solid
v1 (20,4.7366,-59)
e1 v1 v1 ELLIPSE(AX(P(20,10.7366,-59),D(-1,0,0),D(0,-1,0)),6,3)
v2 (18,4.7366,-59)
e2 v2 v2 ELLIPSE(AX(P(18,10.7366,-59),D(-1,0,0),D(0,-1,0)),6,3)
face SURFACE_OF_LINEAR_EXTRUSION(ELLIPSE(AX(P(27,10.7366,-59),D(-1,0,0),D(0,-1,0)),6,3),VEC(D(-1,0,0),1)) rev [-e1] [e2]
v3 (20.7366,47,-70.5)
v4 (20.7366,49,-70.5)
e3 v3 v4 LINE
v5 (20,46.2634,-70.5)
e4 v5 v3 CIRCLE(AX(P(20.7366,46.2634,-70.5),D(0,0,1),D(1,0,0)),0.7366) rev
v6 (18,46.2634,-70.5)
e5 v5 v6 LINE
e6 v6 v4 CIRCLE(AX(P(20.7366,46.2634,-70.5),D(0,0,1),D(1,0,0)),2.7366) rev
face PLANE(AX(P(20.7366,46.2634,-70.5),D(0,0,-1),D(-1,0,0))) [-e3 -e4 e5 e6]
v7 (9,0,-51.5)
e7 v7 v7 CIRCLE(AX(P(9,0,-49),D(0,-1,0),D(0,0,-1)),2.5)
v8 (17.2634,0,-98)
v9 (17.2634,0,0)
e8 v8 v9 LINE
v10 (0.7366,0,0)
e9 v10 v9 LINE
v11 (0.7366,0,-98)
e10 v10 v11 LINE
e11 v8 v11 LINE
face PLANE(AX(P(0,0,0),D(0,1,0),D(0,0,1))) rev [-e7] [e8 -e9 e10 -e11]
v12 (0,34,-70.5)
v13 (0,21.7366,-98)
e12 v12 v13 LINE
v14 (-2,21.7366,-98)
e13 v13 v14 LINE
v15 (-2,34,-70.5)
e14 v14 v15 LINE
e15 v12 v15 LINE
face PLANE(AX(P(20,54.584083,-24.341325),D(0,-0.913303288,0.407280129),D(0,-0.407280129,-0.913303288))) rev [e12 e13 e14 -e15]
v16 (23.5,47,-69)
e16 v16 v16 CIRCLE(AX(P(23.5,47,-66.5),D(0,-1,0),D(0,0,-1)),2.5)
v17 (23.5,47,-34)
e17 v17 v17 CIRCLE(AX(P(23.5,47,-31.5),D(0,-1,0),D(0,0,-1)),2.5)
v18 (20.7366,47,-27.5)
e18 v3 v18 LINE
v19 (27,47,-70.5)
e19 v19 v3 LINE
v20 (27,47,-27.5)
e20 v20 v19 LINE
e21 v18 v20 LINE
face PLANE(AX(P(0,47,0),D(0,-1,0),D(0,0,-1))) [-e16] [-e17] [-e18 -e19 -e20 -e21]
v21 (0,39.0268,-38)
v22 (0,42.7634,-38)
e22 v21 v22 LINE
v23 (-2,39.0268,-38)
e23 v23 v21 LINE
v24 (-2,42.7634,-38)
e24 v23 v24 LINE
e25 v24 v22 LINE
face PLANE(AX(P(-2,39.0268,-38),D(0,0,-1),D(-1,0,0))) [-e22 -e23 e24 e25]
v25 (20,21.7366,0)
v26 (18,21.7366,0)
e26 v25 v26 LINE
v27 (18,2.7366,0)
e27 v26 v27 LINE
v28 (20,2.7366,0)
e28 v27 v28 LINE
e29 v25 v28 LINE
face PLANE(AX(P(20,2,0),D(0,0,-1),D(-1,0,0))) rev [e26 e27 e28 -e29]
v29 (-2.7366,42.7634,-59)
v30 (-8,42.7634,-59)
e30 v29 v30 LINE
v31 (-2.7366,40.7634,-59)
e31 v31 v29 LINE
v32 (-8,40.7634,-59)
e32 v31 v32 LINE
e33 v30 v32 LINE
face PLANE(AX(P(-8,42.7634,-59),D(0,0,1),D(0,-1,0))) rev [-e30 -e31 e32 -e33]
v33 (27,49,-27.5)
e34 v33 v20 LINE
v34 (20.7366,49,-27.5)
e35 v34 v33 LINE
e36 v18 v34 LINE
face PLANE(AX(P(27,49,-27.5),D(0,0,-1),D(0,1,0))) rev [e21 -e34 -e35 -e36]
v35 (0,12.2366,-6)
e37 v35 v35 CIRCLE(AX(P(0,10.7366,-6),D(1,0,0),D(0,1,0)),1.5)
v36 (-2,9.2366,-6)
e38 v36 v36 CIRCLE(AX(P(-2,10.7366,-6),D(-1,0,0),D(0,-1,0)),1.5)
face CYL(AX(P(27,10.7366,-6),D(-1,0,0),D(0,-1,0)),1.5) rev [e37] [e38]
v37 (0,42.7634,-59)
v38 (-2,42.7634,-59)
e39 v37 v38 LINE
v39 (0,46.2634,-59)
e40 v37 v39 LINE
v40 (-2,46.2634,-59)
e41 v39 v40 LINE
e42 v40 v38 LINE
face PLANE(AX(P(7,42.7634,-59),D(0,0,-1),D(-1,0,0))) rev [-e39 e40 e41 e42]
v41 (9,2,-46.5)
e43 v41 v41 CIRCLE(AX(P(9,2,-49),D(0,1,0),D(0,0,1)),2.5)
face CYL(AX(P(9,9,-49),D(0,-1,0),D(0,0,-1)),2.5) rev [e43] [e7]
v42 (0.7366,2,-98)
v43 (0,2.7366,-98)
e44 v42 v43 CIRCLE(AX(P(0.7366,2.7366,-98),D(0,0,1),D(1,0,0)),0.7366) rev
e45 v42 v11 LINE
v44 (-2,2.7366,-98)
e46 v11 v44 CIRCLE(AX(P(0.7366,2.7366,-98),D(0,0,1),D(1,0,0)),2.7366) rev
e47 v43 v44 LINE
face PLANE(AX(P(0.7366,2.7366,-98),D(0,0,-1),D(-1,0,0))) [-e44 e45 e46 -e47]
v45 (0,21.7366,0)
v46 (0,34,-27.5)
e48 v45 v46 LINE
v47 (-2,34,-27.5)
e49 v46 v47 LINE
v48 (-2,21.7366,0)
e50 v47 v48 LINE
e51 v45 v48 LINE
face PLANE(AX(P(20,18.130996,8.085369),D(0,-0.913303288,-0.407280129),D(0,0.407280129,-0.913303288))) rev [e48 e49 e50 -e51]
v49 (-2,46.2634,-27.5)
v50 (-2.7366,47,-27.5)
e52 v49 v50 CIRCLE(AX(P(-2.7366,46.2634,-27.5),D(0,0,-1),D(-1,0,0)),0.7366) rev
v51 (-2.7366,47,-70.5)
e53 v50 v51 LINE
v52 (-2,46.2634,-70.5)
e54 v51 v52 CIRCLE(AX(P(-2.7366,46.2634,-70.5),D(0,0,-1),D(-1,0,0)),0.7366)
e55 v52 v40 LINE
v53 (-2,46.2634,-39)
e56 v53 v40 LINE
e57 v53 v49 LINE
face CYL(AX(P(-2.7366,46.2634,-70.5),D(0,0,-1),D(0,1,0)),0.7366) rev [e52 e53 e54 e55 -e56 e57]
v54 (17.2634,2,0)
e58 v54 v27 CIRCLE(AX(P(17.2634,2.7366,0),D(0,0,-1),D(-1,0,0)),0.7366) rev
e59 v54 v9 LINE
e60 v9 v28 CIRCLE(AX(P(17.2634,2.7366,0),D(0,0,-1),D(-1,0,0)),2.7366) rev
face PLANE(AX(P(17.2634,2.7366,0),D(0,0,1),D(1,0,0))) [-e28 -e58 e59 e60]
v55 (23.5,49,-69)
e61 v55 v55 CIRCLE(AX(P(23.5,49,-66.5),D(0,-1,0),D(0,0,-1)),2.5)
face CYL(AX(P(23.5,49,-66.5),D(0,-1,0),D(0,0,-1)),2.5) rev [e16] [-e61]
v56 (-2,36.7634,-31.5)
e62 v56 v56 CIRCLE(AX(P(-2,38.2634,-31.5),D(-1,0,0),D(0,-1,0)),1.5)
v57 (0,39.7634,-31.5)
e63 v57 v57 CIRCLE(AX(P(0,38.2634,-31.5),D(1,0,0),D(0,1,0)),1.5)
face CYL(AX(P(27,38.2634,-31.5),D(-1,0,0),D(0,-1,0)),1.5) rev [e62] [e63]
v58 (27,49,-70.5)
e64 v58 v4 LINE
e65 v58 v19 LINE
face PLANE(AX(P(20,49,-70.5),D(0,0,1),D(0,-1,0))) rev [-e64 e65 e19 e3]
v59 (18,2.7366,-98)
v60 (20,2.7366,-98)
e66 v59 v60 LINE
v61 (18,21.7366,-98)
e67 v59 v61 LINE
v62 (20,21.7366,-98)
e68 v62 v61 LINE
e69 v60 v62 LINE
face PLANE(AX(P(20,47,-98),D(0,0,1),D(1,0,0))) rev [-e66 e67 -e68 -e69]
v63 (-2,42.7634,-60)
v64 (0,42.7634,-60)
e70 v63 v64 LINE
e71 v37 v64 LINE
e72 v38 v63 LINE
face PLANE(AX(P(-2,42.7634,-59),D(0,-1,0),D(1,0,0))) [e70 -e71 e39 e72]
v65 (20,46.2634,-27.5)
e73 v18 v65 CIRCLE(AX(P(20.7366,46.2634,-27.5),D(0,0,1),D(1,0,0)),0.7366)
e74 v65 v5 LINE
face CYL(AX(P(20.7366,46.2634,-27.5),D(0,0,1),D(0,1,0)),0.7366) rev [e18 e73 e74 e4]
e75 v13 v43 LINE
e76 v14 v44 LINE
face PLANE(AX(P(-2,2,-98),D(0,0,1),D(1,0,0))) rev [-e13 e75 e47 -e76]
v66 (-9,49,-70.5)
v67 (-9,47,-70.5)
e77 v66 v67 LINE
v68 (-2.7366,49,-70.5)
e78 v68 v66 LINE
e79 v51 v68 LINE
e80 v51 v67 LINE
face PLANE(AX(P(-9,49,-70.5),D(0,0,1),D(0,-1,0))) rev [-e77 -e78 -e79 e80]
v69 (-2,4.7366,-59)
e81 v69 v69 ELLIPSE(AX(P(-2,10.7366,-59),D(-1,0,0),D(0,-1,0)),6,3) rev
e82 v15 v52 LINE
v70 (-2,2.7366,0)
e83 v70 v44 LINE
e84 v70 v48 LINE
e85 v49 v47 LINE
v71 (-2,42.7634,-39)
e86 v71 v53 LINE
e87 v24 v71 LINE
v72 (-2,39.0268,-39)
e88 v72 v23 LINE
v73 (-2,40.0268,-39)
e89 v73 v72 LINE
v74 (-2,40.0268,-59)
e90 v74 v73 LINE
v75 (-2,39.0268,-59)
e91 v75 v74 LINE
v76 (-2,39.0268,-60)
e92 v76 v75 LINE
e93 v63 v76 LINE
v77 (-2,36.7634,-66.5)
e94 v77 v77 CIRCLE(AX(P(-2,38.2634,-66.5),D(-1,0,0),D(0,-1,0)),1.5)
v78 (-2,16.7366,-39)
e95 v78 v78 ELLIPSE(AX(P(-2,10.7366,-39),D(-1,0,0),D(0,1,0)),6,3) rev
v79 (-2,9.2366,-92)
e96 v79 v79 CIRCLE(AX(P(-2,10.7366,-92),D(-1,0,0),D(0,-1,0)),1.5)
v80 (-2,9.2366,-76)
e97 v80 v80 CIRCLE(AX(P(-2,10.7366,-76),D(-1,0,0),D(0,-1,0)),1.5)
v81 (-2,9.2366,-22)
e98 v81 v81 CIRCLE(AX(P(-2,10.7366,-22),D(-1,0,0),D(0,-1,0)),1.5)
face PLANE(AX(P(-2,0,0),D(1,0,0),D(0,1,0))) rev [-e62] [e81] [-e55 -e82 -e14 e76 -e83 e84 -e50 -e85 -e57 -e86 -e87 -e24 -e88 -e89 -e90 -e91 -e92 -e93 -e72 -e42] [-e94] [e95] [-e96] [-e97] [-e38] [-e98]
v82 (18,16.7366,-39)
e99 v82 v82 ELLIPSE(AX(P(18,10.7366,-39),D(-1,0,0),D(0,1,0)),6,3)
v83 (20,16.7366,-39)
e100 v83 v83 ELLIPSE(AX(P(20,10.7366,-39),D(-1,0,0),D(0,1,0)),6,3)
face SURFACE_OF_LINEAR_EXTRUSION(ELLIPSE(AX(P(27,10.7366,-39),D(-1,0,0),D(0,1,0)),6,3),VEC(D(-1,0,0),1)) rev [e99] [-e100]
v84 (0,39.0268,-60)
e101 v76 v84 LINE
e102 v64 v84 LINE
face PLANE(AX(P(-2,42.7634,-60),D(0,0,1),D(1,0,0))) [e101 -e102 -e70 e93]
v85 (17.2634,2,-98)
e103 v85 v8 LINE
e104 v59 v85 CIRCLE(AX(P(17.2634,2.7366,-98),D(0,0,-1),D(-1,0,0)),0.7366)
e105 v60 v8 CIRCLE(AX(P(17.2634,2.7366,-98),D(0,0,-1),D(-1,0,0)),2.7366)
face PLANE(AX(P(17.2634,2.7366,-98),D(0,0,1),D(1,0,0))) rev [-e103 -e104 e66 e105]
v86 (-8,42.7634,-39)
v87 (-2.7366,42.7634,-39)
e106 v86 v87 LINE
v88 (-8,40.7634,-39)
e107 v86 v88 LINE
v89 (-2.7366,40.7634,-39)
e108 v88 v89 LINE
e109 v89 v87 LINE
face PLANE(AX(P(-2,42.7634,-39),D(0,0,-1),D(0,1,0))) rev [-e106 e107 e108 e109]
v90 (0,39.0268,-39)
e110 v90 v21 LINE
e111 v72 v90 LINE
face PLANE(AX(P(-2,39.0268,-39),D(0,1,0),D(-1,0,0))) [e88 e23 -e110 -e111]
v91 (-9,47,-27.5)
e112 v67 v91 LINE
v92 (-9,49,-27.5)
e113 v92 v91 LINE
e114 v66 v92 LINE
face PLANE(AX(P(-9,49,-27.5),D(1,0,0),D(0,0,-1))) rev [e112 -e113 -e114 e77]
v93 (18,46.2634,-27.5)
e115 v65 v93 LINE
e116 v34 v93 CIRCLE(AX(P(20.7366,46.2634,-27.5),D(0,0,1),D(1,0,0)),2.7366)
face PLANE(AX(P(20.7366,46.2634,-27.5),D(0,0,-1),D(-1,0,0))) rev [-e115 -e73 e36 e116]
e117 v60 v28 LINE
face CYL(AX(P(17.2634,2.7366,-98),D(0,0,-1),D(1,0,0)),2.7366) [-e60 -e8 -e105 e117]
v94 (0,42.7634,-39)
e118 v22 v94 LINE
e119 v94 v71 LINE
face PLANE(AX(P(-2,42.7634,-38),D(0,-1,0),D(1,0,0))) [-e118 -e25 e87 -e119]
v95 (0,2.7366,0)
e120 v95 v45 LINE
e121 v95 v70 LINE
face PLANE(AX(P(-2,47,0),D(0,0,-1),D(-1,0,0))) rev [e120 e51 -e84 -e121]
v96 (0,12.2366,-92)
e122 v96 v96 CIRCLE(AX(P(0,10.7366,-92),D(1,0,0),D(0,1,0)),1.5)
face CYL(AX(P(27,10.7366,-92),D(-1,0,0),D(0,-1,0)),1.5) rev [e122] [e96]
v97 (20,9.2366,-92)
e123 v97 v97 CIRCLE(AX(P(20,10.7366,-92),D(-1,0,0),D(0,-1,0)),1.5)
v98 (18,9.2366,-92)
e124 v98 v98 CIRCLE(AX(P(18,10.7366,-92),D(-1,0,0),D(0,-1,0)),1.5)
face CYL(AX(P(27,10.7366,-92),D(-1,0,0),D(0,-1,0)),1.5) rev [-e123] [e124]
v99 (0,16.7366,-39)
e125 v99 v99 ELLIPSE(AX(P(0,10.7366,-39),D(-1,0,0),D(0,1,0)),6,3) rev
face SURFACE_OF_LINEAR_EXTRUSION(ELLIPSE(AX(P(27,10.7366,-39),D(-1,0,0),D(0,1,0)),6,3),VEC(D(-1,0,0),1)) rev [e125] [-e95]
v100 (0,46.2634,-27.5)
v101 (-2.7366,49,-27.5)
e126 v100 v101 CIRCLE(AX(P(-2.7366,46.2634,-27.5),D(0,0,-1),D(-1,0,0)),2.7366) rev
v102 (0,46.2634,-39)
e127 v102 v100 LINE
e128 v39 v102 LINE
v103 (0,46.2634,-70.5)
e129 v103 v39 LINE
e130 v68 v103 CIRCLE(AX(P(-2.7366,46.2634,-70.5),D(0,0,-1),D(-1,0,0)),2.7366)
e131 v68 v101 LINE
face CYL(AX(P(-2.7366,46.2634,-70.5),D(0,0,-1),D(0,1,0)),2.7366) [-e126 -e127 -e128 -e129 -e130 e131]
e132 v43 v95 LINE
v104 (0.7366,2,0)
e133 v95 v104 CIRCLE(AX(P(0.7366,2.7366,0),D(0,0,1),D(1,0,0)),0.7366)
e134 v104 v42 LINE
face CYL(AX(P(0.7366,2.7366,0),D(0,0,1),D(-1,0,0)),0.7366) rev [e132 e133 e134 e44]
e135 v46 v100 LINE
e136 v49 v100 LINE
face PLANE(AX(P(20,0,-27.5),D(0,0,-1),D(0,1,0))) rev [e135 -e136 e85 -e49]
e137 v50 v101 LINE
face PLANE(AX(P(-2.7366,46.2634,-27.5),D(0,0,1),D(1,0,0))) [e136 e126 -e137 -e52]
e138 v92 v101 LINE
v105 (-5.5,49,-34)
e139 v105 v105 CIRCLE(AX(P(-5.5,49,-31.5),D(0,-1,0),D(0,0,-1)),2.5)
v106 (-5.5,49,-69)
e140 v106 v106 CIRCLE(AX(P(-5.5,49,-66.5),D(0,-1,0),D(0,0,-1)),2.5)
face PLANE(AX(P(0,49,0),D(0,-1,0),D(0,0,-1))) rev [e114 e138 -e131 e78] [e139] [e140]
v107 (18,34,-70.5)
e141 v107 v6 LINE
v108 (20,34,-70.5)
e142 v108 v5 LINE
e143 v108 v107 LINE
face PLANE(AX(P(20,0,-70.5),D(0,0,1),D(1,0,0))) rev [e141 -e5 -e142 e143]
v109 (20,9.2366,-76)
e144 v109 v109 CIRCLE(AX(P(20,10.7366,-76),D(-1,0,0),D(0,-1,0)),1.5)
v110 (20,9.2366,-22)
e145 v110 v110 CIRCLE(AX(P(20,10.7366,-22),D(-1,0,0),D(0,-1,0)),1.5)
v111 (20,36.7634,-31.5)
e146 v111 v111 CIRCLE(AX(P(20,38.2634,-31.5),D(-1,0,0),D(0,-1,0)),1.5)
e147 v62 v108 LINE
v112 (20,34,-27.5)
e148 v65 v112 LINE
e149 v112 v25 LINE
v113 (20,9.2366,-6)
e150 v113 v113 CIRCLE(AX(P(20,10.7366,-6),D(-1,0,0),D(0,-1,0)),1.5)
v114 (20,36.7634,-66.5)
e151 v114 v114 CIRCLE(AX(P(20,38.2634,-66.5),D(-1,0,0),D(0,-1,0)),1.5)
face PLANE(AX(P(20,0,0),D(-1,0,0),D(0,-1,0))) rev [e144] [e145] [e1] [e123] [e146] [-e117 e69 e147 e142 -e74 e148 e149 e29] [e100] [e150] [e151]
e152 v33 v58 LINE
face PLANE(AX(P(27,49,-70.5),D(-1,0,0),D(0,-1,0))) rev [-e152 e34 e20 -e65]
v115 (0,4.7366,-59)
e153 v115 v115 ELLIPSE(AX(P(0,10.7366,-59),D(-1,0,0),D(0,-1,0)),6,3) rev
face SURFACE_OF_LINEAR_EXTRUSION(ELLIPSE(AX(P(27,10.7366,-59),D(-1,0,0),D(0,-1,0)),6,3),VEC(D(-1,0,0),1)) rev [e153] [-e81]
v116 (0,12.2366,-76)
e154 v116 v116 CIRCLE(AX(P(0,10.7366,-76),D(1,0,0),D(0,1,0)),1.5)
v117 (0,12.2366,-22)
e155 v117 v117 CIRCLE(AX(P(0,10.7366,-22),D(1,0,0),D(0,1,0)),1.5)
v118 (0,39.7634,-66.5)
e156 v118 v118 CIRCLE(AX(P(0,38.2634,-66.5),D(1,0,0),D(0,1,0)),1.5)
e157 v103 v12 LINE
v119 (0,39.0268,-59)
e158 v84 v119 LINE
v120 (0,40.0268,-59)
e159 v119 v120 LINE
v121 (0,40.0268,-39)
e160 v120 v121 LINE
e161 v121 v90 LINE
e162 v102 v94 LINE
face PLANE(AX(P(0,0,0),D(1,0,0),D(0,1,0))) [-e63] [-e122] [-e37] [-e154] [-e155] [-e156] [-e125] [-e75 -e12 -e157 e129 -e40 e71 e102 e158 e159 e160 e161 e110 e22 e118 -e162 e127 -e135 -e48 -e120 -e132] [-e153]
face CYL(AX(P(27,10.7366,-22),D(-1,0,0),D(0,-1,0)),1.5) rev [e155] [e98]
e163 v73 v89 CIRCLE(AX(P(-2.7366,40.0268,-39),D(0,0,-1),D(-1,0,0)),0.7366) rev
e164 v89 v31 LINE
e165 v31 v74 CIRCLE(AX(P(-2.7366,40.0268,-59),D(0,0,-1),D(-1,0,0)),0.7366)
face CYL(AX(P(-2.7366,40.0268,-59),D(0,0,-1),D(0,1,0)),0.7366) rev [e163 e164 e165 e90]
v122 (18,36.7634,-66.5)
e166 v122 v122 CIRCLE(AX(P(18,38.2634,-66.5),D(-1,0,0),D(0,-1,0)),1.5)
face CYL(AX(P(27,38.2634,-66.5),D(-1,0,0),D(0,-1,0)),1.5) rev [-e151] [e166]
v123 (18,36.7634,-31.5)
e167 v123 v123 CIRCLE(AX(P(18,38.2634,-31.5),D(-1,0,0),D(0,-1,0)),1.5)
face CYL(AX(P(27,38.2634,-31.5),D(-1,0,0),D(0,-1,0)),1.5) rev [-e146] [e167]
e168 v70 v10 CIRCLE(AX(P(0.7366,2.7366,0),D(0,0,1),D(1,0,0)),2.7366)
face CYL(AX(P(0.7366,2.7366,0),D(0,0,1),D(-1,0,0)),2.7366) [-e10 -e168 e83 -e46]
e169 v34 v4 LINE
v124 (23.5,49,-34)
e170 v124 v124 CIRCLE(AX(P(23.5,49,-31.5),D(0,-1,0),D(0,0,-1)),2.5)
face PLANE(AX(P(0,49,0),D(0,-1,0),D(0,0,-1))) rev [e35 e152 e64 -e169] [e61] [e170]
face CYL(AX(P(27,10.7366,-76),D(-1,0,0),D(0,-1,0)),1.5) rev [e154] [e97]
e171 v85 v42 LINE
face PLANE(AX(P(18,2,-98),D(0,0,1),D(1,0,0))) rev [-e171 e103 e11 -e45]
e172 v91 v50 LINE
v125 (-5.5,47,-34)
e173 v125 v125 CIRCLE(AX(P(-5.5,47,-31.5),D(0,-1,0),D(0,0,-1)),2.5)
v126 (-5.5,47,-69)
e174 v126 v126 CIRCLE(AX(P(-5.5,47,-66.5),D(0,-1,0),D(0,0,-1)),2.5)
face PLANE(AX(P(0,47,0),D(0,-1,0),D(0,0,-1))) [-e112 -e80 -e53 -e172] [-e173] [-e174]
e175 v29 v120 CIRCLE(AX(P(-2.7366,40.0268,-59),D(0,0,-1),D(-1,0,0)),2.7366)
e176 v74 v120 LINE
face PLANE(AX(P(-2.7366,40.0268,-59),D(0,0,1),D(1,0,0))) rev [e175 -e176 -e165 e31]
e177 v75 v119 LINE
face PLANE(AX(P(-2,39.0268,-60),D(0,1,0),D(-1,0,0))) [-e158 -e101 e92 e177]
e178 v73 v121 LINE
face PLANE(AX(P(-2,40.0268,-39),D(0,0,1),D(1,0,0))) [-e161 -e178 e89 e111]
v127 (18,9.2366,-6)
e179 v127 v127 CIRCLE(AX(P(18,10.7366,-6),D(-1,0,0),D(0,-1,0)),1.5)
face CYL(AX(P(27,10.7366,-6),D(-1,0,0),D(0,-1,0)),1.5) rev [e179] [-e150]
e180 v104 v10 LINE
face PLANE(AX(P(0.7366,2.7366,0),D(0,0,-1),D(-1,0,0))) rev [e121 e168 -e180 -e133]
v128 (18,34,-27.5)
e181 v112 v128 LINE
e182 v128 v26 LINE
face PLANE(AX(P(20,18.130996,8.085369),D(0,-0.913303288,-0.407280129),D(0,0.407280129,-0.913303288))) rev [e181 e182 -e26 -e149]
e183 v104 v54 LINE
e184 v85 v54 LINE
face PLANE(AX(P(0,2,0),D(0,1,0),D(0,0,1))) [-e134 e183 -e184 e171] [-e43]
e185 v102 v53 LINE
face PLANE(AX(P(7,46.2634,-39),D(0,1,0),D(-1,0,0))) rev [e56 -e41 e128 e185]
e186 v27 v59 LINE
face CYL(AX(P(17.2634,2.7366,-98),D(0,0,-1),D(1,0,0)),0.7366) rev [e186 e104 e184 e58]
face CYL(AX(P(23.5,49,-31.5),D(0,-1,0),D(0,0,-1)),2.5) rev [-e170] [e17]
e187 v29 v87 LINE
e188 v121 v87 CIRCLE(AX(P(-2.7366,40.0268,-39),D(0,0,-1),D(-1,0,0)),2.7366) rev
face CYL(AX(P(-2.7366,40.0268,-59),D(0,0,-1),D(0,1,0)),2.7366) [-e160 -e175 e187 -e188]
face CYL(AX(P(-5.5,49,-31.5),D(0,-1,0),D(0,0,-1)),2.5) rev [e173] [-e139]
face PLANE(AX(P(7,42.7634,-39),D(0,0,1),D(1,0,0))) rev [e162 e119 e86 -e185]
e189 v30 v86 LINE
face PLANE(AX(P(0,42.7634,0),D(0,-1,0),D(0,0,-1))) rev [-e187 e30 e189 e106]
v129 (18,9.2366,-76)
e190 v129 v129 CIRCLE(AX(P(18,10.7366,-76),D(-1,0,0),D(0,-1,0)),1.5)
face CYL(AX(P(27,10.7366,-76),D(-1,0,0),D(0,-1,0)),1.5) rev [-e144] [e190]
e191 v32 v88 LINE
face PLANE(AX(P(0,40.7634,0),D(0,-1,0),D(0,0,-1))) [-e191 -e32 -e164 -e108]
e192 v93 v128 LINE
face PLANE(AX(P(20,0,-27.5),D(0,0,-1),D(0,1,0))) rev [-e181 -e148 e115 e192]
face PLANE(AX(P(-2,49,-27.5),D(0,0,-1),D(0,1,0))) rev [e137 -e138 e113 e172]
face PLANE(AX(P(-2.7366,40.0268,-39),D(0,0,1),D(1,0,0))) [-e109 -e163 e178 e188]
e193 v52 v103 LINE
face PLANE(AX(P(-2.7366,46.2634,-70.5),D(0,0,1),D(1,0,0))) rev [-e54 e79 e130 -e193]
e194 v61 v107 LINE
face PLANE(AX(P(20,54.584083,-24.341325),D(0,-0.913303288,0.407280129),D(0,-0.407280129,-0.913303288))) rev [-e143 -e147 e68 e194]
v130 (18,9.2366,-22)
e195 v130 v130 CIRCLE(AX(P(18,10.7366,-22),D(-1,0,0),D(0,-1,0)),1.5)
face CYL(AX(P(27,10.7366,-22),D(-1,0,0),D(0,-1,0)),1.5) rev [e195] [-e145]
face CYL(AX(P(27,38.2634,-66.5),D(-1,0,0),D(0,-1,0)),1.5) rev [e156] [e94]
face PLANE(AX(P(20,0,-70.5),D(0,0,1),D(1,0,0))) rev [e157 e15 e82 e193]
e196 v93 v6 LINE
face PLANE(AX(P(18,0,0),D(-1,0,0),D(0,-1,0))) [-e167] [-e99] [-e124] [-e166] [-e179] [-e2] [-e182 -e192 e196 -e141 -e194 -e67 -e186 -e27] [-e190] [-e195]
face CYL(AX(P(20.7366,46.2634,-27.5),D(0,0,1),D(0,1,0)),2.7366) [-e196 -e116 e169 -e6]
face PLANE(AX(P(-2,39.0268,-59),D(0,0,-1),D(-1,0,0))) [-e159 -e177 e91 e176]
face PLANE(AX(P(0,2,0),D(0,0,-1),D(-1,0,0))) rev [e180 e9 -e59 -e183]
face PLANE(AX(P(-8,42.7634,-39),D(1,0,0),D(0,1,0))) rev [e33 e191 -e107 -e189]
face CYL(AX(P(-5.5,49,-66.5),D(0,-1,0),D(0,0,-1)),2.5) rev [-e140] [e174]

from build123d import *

# Parameters (mm, degrees)
SCHIZZO1_W                       = 18
SCHIZZO1_H                       = 98
BASE_FLANGIA1_DEPTH              = 2
BORDO_FLANGIA1_STRIP_W           = 9.4732
BORDO_FLANGIA1_STRIP_H           = 2
BORDO_FLANGIA1_STRIP_CUT_DEPTH   = 98
BORDO_FLANGIA1_STRIP_2_W         = 9.4732
BORDO_FLANGIA1_STRIP_2_H         = 2
BORDO_FLANGIA1_STRIP_CUT_2_DEPTH = 98
BORDO_FLANGIA1_DEPTH             = 98
BORDO_FLANGIA1_BEND_DEPTH        = 98
TAGLIO_ESTRUSIONE2_DEPTH         = 111.891839195
TAGLIO_ESTRUSIONE2_DEPTH_BACK    = 111.891839195
BORDO_FLANGIA2_STRIP_W           = 9.4732
BORDO_FLANGIA2_STRIP_H           = 2
BORDO_FLANGIA2_STRIP_CUT_DEPTH   = 43
BORDO_FLANGIA2_STRIP_2_W         = 9.4732
BORDO_FLANGIA2_STRIP_2_H         = 2
BORDO_FLANGIA2_STRIP_CUT_2_DEPTH = 43
BORDO_FLANGIA2_DEPTH             = 43
BORDO_FLANGIA2_BEND_DEPTH        = 43
TAGLIO_ESTRUSIONE3_DEPTH         = 114.340195871
TAGLIO_ESTRUSIONE3_DEPTH_BACK    = 114.340195871
SCHIZZO7_R                       = 1.5
SCHIZZO8_R                       = 2.5
TAGLIO_ESTRUSIONE5_DEPTH         = 112.991071073
SCHIZZO9_R                       = 2.5
TAGLIO_ESTRUSIONE6_DEPTH         = 112.991071073
TAGLIO_ESTRUSIONE7_DEPTH         = 114.340195871
TAGLIO_ESTRUSIONE7_DEPTH_BACK    = 114.340195871
SCHIZZO10_RX                     = 6
SCHIZZO10_RY                     = 3
SCHIZZO11_W                      = 20
SCHIZZO11_H                      = 3.5
TAGLIO_ESTRUSIONE8_DEPTH         = 9
BORDO_FLANGIA4_START             = -60
BORDO_FLANGIA4_DEPTH             = 22
BORDO_FLANGIA4_2_DEPTH           = 1
BORDO_FLANGIA4_START_2           = -39
BORDO_FLANGIA4_3_DEPTH           = 1
BORDO_FLANGIA4_START_3           = -59
BORDO_FLANGIA4_4_DEPTH           = 20
SCHIZZO13_R                      = 2.5
TAGLIO_ESTRUSIONE9_DEPTH         = 9


# Read off the part's stored shape, not the designer's step: Bordo-Flangia4
# Sheet-metal steps are written as plain solids
with BuildPart() as part:
    # Schizzo1 → Base-Flangia1 (new body)
    with BuildSketch(Plane(origin=(0, 0, 0), x_dir=(1, 0, 0), z_dir=(0, 1, 0))):
        with Locations((9, 49)):
            Rectangle(SCHIZZO1_W, SCHIZZO1_H)
    extrude(amount=BASE_FLANGIA1_DEPTH)

    # Bordo-Flangia1 strip (across the edge) → Bordo-Flangia1 strip cut (cut)
    with BuildSketch(Plane(origin=(0, 2, -98), x_dir=(1, 0, 0), z_dir=(0, 0, 1))):
        with Locations((-4, -1)):
            Rectangle(BORDO_FLANGIA1_STRIP_W, BORDO_FLANGIA1_STRIP_H)
    extrude(amount=BORDO_FLANGIA1_STRIP_CUT_DEPTH, mode=Mode.SUBTRACT)

    # Bordo-Flangia1 strip 2 (across the edge) → Bordo-Flangia1 strip cut 2 (cut)
    with BuildSketch(Plane(origin=(18, 2, 0), x_dir=(-1, 0, 0), z_dir=(0, 0, -1))):
        with Locations((-4, -1)):
            Rectangle(BORDO_FLANGIA1_STRIP_2_W, BORDO_FLANGIA1_STRIP_2_H)
    extrude(amount=BORDO_FLANGIA1_STRIP_CUT_2_DEPTH, mode=Mode.SUBTRACT)

    # Bordo-Flangia1 section (across the edge) → Bordo-Flangia1 (add)
    with BuildSketch(Plane(origin=(0, 2, -98), x_dir=(1, 0, 0), z_dir=(0, 0, 1))):
        with BuildLine():
            Line((-2, 0.7366), (-2, 45))
            Line((-2, 45), (0, 45))
            Line((0, 45), (0, 0.7366))
            ThreePointArc((0, 0.7366), (0.215745145, 0.215745145), (0.7366, 0))
            Line((0.7366, 0), (0.7366, -2))
            ThreePointArc((0.7366, -2), (-1.198468417, -1.198468417), (-2, 0.7366))
        make_face()
    extrude(amount=BORDO_FLANGIA1_DEPTH)

    # Bordo-Flangia1 section 2 (across the edge) → Bordo-Flangia1 bend (add)
    with BuildSketch(Plane(origin=(18, 2, 0), x_dir=(-1, 0, 0), z_dir=(0, 0, -1))):
        with BuildLine():
            Line((-2, 0.7366), (-2, 45))
            Line((-2, 45), (0, 45))
            Line((0, 45), (0, 0.7366))
            ThreePointArc((0, 0.7366), (0.215745145, 0.215745145), (0.7366, 0))
            Line((0.7366, 0), (0.7366, -2))
            ThreePointArc((0.7366, -2), (-1.198468417, -1.198468417), (-2, 0.7366))
        make_face()
    extrude(amount=BORDO_FLANGIA1_BEND_DEPTH)

    # Schizzo4 → Taglio-Estrusione2 (cut, two sides: drawn at the far end of the back side and taken through both)
    with BuildSketch(Plane.ZY.offset(2).offset(-TAGLIO_ESTRUSIONE2_DEPTH_BACK)):
        Polygon((-98, 47), (-98, 21.7366), (-70.5, 34), (-70.5, 47), align=None)
        Polygon((-27.5, 34), (0, 21.7366), (0, 47), (-27.5, 47), align=None)
    extrude(amount=TAGLIO_ESTRUSIONE2_DEPTH + TAGLIO_ESTRUSIONE2_DEPTH_BACK, mode=Mode.SUBTRACT)

    # Bordo-Flangia2 strip (across the edge) → Bordo-Flangia2 strip cut (cut)
    with BuildSketch(Plane(origin=(20, 47, -70.5), x_dir=(0, -1, 0), z_dir=(0, 0, 1))):
        with Locations((-4, -1)):
            Rectangle(BORDO_FLANGIA2_STRIP_W, BORDO_FLANGIA2_STRIP_H)
    extrude(amount=BORDO_FLANGIA2_STRIP_CUT_DEPTH, mode=Mode.SUBTRACT)

    # Bordo-Flangia2 strip 2 (across the edge) → Bordo-Flangia2 strip cut 2 (cut)
    with BuildSketch(Plane(origin=(-2, 47, -27.5), x_dir=(0, -1, 0), z_dir=(0, 0, -1))):
        with Locations((-4, -1)):
            Rectangle(BORDO_FLANGIA2_STRIP_2_W, BORDO_FLANGIA2_STRIP_2_H)
    extrude(amount=BORDO_FLANGIA2_STRIP_CUT_2_DEPTH, mode=Mode.SUBTRACT)

    # Bordo-Flangia2 section (across the edge) → Bordo-Flangia2 (add)
    with BuildSketch(Plane(origin=(20, 47, -70.5), x_dir=(0, -1, 0), z_dir=(0, 0, 1))):
        with BuildLine():
            Line((-2, 0.7366), (-2, 7))
            Line((-2, 7), (0, 7))
            Line((0, 7), (0, 0.7366))
            ThreePointArc((0, 0.7366), (0.215745145, 0.215745145), (0.7366, 0))
            Line((0.7366, 0), (0.7366, -2))
            ThreePointArc((0.7366, -2), (-1.198468417, -1.198468417), (-2, 0.7366))
        make_face()
    extrude(amount=BORDO_FLANGIA2_DEPTH)

    # Bordo-Flangia2 section 2 (across the edge) → Bordo-Flangia2 bend (add)
    with BuildSketch(Plane(origin=(-2, 47, -27.5), x_dir=(0, -1, 0), z_dir=(0, 0, -1))):
        with BuildLine():
            Line((-2, 0.7366), (-2, 7))
            Line((-2, 7), (0, 7))
            Line((0, 7), (0, 0.7366))
            ThreePointArc((0, 0.7366), (0.215745145, 0.215745145), (0.7366, 0))
            Line((0.7366, 0), (0.7366, -2))
            ThreePointArc((0.7366, -2), (-1.198468417, -1.198468417), (-2, 0.7366))
        make_face()
    extrude(amount=BORDO_FLANGIA2_BEND_DEPTH)

    # Schizzo7 → Taglio-Estrusione3 (cut, two sides: drawn at the far end of the back side and taken through both)
    with BuildSketch(Plane.ZY.offset(2).offset(-TAGLIO_ESTRUSIONE3_DEPTH_BACK)):
        with Locations(Location((-66.5, 38.2634, 0), (0, 0, 270))):
            Circle(SCHIZZO7_R)
        with Locations(Location((-31.5, 38.2634, 0), (0, 0, 270))):
            Circle(SCHIZZO7_R)
        with Locations(Location((-92, 10.7366, 0), (0, 0, 270))):
            Circle(SCHIZZO7_R)
        with Locations(Location((-6, 10.7366, 0), (0, 0, 270))):
            Circle(SCHIZZO7_R)
        with Locations(Location((-76, 10.7366, 0), (0, 0, 270))):
            Circle(SCHIZZO7_R)
        with Locations(Location((-22, 10.7366, 0), (0, 0, 270))):
            Circle(SCHIZZO7_R)
    extrude(amount=TAGLIO_ESTRUSIONE3_DEPTH + TAGLIO_ESTRUSIONE3_DEPTH_BACK, mode=Mode.SUBTRACT)

    # Schizzo8 → Taglio-Estrusione5 (cut, through all)
    with BuildSketch(Plane.XZ.offset(-47)):
        with Locations(Location((23.5, -31.5, 0), (0, 0, 270))):
            Circle(SCHIZZO8_R)
        with Locations(Location((23.5, -66.5, 0), (0, 0, 270))):
            Circle(SCHIZZO8_R)
    extrude(amount=-TAGLIO_ESTRUSIONE5_DEPTH, mode=Mode.SUBTRACT)

    # Schizzo9 → Taglio-Estrusione6 (cut, through all)
    with BuildSketch(Plane.XZ.offset(-47)):
        with Locations(Location((-5.5, -31.5, 0), (0, 0, 270))):
            Circle(SCHIZZO9_R)
        with Locations(Location((-5.5, -66.5, 0), (0, 0, 270))):
            Circle(SCHIZZO9_R)
    extrude(amount=-TAGLIO_ESTRUSIONE6_DEPTH, mode=Mode.SUBTRACT)

    # Schizzo10 → Taglio-Estrusione7 (cut, two sides: drawn at the far end of the back side and taken through both)
    with BuildSketch(Plane.ZY.offset(2).offset(-TAGLIO_ESTRUSIONE7_DEPTH_BACK)):
        with Locations(Location((-59, 10.7366), (0, 0, -90))):
            Ellipse(SCHIZZO10_RX, SCHIZZO10_RY)
        with Locations(Location((-39, 10.7366), (0, 0, 90))):
            Ellipse(SCHIZZO10_RX, SCHIZZO10_RY)
    extrude(amount=TAGLIO_ESTRUSIONE7_DEPTH + TAGLIO_ESTRUSIONE7_DEPTH_BACK, mode=Mode.SUBTRACT)

    # Schizzo11 → Taglio-Estrusione8 (cut)
    with BuildSketch(Plane.ZY.offset(2)):
        with Locations((-49, 44.5134)):
            Rectangle(SCHIZZO11_W, SCHIZZO11_H)
    extrude(amount=-TAGLIO_ESTRUSIONE8_DEPTH, mode=Mode.SUBTRACT)

    # Bordo-Flangia4 outline → Bordo-Flangia4 (cut)
    with BuildSketch(Plane.XY.offset(BORDO_FLANGIA4_START)):
        with BuildLine():
            Line((0, 42.7634), (-2, 42.7634))
            Line((-2, 42.7634), (-2, 42.662402398))
            ThreePointArc((-2, 42.662402398), (-0.556604688, 41.681067209), (0, 40.0268))
            Line((0, 40.0268), (0, 42.7634))
        make_face()
    extrude(amount=BORDO_FLANGIA4_DEPTH, mode=Mode.SUBTRACT)

    # Bordo-Flangia4 2 outline → Bordo-Flangia4 2 (cut)
    with BuildSketch(Plane.XY.offset(BORDO_FLANGIA4_START)):
        with BuildLine():
            ThreePointArc((0, 40.0268), (-0.556604688, 41.681067209), (-2, 42.662402398))
            Line((-2, 42.662402398), (-2, 39.0268))
            Line((-2, 39.0268), (0, 39.0268))
            Line((0, 39.0268), (0, 40.0268))
        make_face()
    extrude(amount=BORDO_FLANGIA4_2_DEPTH, mode=Mode.SUBTRACT)

    # Bordo-Flangia4 3 outline → Bordo-Flangia4 3 (cut)
    with BuildSketch(Plane.XY.offset(BORDO_FLANGIA4_START_2)):
        with BuildLine():
            ThreePointArc((0, 40.0268), (-0.556604688, 41.681067209), (-2, 42.662402398))
            Line((-2, 42.662402398), (-2, 39.0268))
            Line((-2, 39.0268), (0, 39.0268))
            Line((0, 39.0268), (0, 40.0268))
        make_face()
    extrude(amount=BORDO_FLANGIA4_3_DEPTH, mode=Mode.SUBTRACT)

    # Bordo-Flangia4 4 outline → Bordo-Flangia4 4 (add)
    with BuildSketch(Plane.XY.offset(BORDO_FLANGIA4_START_3)):
        with BuildLine():
            Line((-2, 40.0268), (-2, 42.662402398))
            ThreePointArc((-2, 42.662402398), (-2.364854094, 42.738033029), (-2.7366, 42.7634))
            Line((-2.7366, 42.7634), (-8, 42.7634))
            Line((-8, 42.7634), (-8, 40.7634))
            Line((-8, 40.7634), (-2.7366, 40.7634))
            ThreePointArc((-2.7366, 40.7634), (-2.215745145, 40.547654855), (-2, 40.0268))
        make_face()
    extrude(amount=BORDO_FLANGIA4_4_DEPTH)

    # Schizzo13 → Taglio-Estrusione9 (cut)
    with BuildSketch(Plane.XZ):
        with Locations(Location((9, -49, 0), (0, 0, 270))):
            Circle(SCHIZZO13_R)
    extrude(amount=-TAGLIO_ESTRUSIONE9_DEPTH, mode=Mode.SUBTRACT)


solid = part.part
